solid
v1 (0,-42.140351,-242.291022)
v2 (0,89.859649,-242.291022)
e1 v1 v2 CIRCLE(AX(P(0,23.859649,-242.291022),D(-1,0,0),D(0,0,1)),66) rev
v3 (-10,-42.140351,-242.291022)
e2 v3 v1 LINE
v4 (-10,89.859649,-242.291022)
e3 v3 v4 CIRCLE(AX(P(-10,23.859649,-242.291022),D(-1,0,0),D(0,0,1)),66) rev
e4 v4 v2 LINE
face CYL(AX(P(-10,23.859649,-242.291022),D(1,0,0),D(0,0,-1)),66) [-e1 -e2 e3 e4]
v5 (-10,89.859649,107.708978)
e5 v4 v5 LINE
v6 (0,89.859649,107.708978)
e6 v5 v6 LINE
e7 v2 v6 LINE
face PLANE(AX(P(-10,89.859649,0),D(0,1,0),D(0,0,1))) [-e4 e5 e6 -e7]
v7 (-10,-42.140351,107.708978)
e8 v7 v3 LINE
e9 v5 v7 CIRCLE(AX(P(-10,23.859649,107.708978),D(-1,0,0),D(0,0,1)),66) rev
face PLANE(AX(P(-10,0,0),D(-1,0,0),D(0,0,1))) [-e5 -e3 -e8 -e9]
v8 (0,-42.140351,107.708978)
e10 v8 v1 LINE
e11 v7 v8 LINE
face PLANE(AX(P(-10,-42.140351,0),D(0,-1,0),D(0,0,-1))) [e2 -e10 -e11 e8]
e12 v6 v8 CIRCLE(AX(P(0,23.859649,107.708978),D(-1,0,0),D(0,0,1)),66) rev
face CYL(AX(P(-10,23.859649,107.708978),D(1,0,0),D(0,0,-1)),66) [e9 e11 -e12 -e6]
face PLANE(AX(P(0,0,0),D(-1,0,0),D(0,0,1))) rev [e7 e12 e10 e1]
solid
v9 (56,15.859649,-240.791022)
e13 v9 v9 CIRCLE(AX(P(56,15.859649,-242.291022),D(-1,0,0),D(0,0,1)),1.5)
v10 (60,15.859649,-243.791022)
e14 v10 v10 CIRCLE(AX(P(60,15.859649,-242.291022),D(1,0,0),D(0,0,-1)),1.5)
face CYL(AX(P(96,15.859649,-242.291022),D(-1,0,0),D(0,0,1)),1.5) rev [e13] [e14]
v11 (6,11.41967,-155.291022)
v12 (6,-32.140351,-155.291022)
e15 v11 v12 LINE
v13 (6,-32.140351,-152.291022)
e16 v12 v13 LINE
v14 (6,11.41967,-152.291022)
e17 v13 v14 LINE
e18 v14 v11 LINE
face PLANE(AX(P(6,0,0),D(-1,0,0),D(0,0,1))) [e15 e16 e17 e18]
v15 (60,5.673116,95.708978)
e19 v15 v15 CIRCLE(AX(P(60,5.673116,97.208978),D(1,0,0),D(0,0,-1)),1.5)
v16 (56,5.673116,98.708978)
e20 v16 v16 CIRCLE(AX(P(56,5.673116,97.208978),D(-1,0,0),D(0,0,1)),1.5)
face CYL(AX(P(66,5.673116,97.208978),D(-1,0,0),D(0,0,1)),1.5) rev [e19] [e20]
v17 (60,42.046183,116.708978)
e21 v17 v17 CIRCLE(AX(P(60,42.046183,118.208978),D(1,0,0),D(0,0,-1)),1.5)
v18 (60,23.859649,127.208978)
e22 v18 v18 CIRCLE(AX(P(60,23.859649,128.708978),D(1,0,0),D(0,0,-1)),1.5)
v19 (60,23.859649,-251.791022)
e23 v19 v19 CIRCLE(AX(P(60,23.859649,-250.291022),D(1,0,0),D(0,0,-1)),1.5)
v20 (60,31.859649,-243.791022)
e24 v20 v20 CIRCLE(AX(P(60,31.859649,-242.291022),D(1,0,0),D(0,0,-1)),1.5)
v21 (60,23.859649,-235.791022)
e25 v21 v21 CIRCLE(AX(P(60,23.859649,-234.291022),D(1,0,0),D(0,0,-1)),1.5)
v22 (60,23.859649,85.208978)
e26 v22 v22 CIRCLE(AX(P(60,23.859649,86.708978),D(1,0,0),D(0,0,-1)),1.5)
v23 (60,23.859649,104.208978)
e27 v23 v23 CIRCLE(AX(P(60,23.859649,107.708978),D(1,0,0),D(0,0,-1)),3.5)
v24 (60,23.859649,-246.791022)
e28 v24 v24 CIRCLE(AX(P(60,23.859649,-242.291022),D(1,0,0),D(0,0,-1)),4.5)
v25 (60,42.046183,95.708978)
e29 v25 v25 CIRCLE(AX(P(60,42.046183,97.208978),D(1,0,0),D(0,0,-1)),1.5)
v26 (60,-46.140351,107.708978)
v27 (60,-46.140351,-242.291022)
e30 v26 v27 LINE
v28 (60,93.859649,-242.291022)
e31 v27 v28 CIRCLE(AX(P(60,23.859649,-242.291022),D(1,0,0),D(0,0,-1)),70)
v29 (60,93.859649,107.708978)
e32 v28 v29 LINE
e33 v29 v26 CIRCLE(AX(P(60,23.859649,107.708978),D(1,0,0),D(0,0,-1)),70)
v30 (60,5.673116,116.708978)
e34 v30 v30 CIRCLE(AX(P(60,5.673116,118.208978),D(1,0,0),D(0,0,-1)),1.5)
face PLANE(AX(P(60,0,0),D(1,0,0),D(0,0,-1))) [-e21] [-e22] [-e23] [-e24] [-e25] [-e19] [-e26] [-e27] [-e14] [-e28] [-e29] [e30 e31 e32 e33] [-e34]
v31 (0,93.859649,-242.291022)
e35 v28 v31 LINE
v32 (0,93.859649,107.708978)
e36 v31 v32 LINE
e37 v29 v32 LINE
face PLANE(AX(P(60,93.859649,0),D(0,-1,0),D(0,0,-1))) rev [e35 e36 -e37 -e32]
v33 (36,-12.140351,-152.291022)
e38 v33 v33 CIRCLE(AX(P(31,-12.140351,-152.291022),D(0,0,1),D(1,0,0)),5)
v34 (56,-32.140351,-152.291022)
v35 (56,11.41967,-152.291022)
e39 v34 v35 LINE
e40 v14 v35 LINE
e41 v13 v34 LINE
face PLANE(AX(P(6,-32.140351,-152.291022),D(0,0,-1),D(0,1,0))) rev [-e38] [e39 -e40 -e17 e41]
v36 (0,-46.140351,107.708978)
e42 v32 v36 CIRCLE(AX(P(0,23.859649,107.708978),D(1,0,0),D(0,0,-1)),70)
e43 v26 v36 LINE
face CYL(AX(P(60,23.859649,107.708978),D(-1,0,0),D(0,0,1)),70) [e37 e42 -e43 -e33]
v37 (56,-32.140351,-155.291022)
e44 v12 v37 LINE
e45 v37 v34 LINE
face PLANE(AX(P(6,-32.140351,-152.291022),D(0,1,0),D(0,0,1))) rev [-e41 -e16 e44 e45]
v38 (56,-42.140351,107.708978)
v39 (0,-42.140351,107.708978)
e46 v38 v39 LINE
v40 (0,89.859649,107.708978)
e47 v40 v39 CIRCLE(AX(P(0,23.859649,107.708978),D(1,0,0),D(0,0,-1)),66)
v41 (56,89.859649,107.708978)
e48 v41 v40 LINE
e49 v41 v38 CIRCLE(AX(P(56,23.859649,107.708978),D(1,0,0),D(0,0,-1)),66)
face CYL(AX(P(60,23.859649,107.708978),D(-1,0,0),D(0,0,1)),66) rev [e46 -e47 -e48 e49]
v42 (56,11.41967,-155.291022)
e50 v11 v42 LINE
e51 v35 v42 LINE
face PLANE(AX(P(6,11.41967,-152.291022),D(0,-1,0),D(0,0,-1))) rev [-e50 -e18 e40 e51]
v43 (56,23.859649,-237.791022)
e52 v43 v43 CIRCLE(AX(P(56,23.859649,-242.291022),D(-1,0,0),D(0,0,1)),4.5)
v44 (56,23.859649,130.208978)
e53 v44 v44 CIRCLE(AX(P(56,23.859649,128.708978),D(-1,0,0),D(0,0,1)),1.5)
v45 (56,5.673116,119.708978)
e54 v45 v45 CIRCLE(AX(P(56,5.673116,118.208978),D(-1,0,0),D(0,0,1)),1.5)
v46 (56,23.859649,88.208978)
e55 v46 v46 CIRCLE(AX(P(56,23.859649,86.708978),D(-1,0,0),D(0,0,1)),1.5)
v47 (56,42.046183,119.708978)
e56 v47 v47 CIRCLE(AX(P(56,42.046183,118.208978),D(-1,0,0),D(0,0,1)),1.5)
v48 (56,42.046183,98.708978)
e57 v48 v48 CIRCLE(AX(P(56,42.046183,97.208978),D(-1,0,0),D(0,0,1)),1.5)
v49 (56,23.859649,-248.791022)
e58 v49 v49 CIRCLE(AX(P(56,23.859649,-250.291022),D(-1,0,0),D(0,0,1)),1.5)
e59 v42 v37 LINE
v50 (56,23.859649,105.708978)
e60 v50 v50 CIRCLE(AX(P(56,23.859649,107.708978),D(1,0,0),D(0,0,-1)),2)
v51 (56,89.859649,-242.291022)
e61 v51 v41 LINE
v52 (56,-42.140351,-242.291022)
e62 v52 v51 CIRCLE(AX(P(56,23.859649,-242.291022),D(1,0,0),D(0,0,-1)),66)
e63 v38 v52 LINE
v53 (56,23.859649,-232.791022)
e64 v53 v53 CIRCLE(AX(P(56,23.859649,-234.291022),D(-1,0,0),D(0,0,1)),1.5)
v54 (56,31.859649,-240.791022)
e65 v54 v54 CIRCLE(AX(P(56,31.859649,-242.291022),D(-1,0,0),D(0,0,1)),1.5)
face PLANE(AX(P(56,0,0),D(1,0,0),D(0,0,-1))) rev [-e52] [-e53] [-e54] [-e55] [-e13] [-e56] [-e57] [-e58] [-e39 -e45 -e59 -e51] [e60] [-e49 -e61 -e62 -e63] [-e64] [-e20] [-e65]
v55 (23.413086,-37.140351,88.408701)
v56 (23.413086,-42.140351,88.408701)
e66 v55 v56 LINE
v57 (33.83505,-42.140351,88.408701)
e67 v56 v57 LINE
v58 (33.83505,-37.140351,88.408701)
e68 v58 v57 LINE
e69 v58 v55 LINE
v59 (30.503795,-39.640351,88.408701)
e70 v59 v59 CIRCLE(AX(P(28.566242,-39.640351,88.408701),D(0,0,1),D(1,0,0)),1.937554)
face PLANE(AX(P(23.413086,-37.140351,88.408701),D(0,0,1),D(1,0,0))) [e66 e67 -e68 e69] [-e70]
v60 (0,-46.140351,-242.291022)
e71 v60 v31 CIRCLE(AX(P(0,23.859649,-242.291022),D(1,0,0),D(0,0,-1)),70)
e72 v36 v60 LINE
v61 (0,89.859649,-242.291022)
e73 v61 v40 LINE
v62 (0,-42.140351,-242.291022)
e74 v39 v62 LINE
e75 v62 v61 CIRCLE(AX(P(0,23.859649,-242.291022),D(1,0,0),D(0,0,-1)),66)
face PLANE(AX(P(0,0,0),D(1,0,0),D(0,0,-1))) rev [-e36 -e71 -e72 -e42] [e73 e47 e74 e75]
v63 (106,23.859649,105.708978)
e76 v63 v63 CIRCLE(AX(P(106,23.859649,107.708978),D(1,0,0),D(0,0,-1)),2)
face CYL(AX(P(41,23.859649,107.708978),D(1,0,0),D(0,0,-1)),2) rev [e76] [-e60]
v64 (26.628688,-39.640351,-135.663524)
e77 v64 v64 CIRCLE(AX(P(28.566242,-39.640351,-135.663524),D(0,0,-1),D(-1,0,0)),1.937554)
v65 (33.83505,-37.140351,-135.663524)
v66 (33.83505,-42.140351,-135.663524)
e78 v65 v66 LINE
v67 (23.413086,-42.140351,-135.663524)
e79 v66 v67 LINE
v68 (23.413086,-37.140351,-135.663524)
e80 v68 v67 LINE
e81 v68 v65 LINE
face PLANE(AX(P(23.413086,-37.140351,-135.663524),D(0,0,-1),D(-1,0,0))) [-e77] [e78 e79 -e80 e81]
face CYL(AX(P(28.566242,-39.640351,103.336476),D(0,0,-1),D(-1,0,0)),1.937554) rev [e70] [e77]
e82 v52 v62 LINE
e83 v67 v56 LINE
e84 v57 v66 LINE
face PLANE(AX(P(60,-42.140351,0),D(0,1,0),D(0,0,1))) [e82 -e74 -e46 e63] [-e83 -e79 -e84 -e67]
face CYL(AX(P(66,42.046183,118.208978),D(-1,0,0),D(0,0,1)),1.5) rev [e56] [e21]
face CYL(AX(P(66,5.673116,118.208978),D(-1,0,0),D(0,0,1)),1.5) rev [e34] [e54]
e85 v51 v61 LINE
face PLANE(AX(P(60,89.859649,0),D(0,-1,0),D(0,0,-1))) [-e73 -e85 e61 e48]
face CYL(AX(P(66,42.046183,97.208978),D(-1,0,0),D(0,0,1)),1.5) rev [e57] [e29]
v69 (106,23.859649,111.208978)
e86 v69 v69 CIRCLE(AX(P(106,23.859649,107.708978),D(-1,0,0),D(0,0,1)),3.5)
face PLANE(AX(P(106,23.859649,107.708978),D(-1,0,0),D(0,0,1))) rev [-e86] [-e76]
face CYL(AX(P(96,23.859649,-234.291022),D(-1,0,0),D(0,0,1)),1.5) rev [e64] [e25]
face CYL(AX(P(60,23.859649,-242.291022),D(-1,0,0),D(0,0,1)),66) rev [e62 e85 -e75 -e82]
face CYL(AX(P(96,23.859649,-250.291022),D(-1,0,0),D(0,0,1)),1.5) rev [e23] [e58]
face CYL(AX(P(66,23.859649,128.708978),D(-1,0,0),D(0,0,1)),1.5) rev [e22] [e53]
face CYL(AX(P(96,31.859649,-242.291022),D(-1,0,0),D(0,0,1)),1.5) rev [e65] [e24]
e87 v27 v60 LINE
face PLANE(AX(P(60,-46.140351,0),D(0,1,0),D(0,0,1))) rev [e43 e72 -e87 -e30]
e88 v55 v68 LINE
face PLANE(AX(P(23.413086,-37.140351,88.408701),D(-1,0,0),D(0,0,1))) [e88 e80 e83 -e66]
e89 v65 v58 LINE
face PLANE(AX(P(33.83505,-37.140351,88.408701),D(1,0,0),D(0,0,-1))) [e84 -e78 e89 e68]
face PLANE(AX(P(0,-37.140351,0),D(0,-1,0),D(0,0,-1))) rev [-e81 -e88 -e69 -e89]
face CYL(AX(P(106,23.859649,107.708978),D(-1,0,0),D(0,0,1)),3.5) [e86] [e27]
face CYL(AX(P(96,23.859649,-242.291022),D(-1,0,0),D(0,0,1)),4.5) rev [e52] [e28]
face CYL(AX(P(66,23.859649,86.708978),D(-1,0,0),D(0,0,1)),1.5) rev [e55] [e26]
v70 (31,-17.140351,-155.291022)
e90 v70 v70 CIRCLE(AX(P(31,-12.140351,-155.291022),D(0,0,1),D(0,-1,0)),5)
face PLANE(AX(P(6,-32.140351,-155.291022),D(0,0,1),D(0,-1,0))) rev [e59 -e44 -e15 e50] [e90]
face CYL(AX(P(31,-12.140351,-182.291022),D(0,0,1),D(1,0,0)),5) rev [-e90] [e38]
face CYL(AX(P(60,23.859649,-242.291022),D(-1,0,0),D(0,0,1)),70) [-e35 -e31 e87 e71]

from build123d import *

# Parameters (mm, degrees)
BOSS_EXTRUDE1_DEPTH = 60
SHELL1_T            = -4
SKETCH4_R           = 1.5
CUT_EXTRUDE1_DEPTH  = 40
SKETCH6_R           = 4.5
CUT_EXTRUDE2_DEPTH  = 40
SKETCH7_R           = 1.5
CUT_EXTRUDE3_DEPTH  = 10
SKETCH8_R           = 3.5
BOSS_EXTRUDE2_DEPTH = 50
SKETCH9_W           = 3
SKETCH9_H           = 43.560021299
BOSS_EXTRUDE3_DEPTH = 50
SKETCH10_R          = 5
CUT_EXTRUDE4_DEPTH  = 30
BOSS_EXTRUDE4_DEPTH = 10
SKETCH13_R          = 2
CUT_EXTRUDE5_DEPTH  = 65
SKETCH17_W          = 10.421963941
SKETCH17_H          = 224.072224721
BOSS_EXTRUDE5_DEPTH = 9
SKETCH18_R          = 1.93755364
CUT_EXTRUDE6_DEPTH  = 239


with BuildPart() as part:
    # Sketch2 → Boss-Extrude1 (new body)
    with BuildSketch(Plane(origin=(0, 0, 0), x_dir=(0, 0, -1), z_dir=(1, 0, 0))):
        with BuildLine():
            Line((242.291021672, 93.859649123), (-107.708978328, 93.859649123))
            ThreePointArc((-107.708978328, 93.859649123), (-177.708978328, 23.859649123), (-107.708978328, -46.140350877))
            Line((-107.708978328, -46.140350877), (242.291021672, -46.140350877))
            ThreePointArc((242.291021672, -46.140350877), (312.291021672, 23.859649123), (242.291021672, 93.859649123))
        make_face()
    extrude(amount=BOSS_EXTRUDE1_DEPTH)

    # Shell1
    shell1_openings = [part.faces().sort_by_distance(p)[0] for p in [
        (0, 23.859649123, -67.291021672),
    ]]
    offset(amount=SHELL1_T, openings=shell1_openings, kind=Kind.INTERSECTION)

    # Sketch4 → Cut-Extrude1 (cut)
    with BuildSketch(Plane.ZY.offset(-56)):
        with Locations((-242.291021672, 31.859649123)):
            Circle(SKETCH4_R)
        with Locations((-250.291021672, 23.859649123)):
            Circle(SKETCH4_R)
        with Locations((-234.291021672, 23.859649123)):
            Circle(SKETCH4_R)
        with Locations((-242.291021672, 15.859649123)):
            Circle(SKETCH4_R)
    extrude(amount=-CUT_EXTRUDE1_DEPTH, mode=Mode.SUBTRACT)

    # Sketch6 → Cut-Extrude2 (cut)
    with BuildSketch(Plane.ZY.offset(-56)):
        with Locations((-242.291021672, 23.859649123)):
            Circle(SKETCH6_R)
    extrude(amount=-CUT_EXTRUDE2_DEPTH, mode=Mode.SUBTRACT)

    # Sketch7 → Cut-Extrude3 (cut)
    with BuildSketch(Plane.ZY.offset(-56)):
        with Locations((86.708978328, 23.859649123)):
            Circle(SKETCH7_R)
        with Locations((97.208978328, 42.046182602)):
            Circle(SKETCH7_R)
        with Locations((118.208978328, 42.046182602)):
            Circle(SKETCH7_R)
        with Locations((128.708978328, 23.859649123)):
            Circle(SKETCH7_R)
        with Locations((118.208978328, 5.673115643)):
            Circle(SKETCH7_R)
        with Locations((97.208978328, 5.673115643)):
            Circle(SKETCH7_R)
    extrude(amount=-CUT_EXTRUDE3_DEPTH, mode=Mode.SUBTRACT)

    # Sketch8 → Boss-Extrude2 (add)
    with BuildSketch(Plane.ZY.offset(-56)):
        with Locations((107.708978328, 23.859649123)):
            Circle(SKETCH8_R)
    extrude(amount=-BOSS_EXTRUDE2_DEPTH)

    # Sketch9 → Boss-Extrude3 (add)
    with BuildSketch(Plane.ZY.offset(-56)):
        with Locations((-153.791021672, -10.360340228)):
            Rectangle(SKETCH9_W, SKETCH9_H)
    extrude(amount=BOSS_EXTRUDE3_DEPTH)

    # Sketch10 → Cut-Extrude4 (cut)
    with BuildSketch(Plane.XY.offset(-152.291021672)):
        with Locations((31, -12.140350877)):
            Circle(SKETCH10_R)
    extrude(amount=-CUT_EXTRUDE4_DEPTH, mode=Mode.SUBTRACT)

    # Sketch13 → Cut-Extrude5 (cut)
    with BuildSketch(Plane(origin=(106, 0, 0), x_dir=(0, 0, -1), z_dir=(1, 0, 0))):
        with Locations((-107.708978328, 23.859649123)):
            Circle(SKETCH13_R)
    extrude(amount=-CUT_EXTRUDE5_DEPTH, mode=Mode.SUBTRACT)

    # Sketch17 → Boss-Extrude5 (add)
    with BuildSketch(Plane(origin=(0, -46.140350877, 0), x_dir=(-1, 0, 0), z_dir=(0, -1, 0))):
        with Locations((-28.624068245, 23.627411579)):
            Rectangle(SKETCH17_W, SKETCH17_H)
    extrude(amount=-BOSS_EXTRUDE5_DEPTH)

    # Sketch18 → Cut-Extrude6 (cut)
    with BuildSketch(Plane(origin=(0, 0, -135.66352394), x_dir=(-1, 0, 0), z_dir=(0, 0, -1))):
        with Locations((-28.566241777, -39.640350877)):
            Circle(SKETCH18_R)
    extrude(amount=-CUT_EXTRUDE6_DEPTH, mode=Mode.SUBTRACT)


with BuildPart() as body_2:
    # Sketch11 → Boss-Extrude4 (new body)
    with BuildSketch(Plane.ZY):
        with BuildLine():
            Line((107.708978328, 89.859649123), (-242.291021672, 89.859649123))
            ThreePointArc((-242.291021672, 89.859649123), (-308.291021672, 23.859649123), (-242.291021672, -42.140350877))
            Line((-242.291021672, -42.140350877), (107.708978328, -42.140350877))
            ThreePointArc((107.708978328, -42.140350877), (173.708978328, 23.859649123), (107.708978328, 89.859649123))
        make_face()
    extrude(amount=BOSS_EXTRUDE4_DEPTH)


solid = Compound([part.part, body_2.part])
